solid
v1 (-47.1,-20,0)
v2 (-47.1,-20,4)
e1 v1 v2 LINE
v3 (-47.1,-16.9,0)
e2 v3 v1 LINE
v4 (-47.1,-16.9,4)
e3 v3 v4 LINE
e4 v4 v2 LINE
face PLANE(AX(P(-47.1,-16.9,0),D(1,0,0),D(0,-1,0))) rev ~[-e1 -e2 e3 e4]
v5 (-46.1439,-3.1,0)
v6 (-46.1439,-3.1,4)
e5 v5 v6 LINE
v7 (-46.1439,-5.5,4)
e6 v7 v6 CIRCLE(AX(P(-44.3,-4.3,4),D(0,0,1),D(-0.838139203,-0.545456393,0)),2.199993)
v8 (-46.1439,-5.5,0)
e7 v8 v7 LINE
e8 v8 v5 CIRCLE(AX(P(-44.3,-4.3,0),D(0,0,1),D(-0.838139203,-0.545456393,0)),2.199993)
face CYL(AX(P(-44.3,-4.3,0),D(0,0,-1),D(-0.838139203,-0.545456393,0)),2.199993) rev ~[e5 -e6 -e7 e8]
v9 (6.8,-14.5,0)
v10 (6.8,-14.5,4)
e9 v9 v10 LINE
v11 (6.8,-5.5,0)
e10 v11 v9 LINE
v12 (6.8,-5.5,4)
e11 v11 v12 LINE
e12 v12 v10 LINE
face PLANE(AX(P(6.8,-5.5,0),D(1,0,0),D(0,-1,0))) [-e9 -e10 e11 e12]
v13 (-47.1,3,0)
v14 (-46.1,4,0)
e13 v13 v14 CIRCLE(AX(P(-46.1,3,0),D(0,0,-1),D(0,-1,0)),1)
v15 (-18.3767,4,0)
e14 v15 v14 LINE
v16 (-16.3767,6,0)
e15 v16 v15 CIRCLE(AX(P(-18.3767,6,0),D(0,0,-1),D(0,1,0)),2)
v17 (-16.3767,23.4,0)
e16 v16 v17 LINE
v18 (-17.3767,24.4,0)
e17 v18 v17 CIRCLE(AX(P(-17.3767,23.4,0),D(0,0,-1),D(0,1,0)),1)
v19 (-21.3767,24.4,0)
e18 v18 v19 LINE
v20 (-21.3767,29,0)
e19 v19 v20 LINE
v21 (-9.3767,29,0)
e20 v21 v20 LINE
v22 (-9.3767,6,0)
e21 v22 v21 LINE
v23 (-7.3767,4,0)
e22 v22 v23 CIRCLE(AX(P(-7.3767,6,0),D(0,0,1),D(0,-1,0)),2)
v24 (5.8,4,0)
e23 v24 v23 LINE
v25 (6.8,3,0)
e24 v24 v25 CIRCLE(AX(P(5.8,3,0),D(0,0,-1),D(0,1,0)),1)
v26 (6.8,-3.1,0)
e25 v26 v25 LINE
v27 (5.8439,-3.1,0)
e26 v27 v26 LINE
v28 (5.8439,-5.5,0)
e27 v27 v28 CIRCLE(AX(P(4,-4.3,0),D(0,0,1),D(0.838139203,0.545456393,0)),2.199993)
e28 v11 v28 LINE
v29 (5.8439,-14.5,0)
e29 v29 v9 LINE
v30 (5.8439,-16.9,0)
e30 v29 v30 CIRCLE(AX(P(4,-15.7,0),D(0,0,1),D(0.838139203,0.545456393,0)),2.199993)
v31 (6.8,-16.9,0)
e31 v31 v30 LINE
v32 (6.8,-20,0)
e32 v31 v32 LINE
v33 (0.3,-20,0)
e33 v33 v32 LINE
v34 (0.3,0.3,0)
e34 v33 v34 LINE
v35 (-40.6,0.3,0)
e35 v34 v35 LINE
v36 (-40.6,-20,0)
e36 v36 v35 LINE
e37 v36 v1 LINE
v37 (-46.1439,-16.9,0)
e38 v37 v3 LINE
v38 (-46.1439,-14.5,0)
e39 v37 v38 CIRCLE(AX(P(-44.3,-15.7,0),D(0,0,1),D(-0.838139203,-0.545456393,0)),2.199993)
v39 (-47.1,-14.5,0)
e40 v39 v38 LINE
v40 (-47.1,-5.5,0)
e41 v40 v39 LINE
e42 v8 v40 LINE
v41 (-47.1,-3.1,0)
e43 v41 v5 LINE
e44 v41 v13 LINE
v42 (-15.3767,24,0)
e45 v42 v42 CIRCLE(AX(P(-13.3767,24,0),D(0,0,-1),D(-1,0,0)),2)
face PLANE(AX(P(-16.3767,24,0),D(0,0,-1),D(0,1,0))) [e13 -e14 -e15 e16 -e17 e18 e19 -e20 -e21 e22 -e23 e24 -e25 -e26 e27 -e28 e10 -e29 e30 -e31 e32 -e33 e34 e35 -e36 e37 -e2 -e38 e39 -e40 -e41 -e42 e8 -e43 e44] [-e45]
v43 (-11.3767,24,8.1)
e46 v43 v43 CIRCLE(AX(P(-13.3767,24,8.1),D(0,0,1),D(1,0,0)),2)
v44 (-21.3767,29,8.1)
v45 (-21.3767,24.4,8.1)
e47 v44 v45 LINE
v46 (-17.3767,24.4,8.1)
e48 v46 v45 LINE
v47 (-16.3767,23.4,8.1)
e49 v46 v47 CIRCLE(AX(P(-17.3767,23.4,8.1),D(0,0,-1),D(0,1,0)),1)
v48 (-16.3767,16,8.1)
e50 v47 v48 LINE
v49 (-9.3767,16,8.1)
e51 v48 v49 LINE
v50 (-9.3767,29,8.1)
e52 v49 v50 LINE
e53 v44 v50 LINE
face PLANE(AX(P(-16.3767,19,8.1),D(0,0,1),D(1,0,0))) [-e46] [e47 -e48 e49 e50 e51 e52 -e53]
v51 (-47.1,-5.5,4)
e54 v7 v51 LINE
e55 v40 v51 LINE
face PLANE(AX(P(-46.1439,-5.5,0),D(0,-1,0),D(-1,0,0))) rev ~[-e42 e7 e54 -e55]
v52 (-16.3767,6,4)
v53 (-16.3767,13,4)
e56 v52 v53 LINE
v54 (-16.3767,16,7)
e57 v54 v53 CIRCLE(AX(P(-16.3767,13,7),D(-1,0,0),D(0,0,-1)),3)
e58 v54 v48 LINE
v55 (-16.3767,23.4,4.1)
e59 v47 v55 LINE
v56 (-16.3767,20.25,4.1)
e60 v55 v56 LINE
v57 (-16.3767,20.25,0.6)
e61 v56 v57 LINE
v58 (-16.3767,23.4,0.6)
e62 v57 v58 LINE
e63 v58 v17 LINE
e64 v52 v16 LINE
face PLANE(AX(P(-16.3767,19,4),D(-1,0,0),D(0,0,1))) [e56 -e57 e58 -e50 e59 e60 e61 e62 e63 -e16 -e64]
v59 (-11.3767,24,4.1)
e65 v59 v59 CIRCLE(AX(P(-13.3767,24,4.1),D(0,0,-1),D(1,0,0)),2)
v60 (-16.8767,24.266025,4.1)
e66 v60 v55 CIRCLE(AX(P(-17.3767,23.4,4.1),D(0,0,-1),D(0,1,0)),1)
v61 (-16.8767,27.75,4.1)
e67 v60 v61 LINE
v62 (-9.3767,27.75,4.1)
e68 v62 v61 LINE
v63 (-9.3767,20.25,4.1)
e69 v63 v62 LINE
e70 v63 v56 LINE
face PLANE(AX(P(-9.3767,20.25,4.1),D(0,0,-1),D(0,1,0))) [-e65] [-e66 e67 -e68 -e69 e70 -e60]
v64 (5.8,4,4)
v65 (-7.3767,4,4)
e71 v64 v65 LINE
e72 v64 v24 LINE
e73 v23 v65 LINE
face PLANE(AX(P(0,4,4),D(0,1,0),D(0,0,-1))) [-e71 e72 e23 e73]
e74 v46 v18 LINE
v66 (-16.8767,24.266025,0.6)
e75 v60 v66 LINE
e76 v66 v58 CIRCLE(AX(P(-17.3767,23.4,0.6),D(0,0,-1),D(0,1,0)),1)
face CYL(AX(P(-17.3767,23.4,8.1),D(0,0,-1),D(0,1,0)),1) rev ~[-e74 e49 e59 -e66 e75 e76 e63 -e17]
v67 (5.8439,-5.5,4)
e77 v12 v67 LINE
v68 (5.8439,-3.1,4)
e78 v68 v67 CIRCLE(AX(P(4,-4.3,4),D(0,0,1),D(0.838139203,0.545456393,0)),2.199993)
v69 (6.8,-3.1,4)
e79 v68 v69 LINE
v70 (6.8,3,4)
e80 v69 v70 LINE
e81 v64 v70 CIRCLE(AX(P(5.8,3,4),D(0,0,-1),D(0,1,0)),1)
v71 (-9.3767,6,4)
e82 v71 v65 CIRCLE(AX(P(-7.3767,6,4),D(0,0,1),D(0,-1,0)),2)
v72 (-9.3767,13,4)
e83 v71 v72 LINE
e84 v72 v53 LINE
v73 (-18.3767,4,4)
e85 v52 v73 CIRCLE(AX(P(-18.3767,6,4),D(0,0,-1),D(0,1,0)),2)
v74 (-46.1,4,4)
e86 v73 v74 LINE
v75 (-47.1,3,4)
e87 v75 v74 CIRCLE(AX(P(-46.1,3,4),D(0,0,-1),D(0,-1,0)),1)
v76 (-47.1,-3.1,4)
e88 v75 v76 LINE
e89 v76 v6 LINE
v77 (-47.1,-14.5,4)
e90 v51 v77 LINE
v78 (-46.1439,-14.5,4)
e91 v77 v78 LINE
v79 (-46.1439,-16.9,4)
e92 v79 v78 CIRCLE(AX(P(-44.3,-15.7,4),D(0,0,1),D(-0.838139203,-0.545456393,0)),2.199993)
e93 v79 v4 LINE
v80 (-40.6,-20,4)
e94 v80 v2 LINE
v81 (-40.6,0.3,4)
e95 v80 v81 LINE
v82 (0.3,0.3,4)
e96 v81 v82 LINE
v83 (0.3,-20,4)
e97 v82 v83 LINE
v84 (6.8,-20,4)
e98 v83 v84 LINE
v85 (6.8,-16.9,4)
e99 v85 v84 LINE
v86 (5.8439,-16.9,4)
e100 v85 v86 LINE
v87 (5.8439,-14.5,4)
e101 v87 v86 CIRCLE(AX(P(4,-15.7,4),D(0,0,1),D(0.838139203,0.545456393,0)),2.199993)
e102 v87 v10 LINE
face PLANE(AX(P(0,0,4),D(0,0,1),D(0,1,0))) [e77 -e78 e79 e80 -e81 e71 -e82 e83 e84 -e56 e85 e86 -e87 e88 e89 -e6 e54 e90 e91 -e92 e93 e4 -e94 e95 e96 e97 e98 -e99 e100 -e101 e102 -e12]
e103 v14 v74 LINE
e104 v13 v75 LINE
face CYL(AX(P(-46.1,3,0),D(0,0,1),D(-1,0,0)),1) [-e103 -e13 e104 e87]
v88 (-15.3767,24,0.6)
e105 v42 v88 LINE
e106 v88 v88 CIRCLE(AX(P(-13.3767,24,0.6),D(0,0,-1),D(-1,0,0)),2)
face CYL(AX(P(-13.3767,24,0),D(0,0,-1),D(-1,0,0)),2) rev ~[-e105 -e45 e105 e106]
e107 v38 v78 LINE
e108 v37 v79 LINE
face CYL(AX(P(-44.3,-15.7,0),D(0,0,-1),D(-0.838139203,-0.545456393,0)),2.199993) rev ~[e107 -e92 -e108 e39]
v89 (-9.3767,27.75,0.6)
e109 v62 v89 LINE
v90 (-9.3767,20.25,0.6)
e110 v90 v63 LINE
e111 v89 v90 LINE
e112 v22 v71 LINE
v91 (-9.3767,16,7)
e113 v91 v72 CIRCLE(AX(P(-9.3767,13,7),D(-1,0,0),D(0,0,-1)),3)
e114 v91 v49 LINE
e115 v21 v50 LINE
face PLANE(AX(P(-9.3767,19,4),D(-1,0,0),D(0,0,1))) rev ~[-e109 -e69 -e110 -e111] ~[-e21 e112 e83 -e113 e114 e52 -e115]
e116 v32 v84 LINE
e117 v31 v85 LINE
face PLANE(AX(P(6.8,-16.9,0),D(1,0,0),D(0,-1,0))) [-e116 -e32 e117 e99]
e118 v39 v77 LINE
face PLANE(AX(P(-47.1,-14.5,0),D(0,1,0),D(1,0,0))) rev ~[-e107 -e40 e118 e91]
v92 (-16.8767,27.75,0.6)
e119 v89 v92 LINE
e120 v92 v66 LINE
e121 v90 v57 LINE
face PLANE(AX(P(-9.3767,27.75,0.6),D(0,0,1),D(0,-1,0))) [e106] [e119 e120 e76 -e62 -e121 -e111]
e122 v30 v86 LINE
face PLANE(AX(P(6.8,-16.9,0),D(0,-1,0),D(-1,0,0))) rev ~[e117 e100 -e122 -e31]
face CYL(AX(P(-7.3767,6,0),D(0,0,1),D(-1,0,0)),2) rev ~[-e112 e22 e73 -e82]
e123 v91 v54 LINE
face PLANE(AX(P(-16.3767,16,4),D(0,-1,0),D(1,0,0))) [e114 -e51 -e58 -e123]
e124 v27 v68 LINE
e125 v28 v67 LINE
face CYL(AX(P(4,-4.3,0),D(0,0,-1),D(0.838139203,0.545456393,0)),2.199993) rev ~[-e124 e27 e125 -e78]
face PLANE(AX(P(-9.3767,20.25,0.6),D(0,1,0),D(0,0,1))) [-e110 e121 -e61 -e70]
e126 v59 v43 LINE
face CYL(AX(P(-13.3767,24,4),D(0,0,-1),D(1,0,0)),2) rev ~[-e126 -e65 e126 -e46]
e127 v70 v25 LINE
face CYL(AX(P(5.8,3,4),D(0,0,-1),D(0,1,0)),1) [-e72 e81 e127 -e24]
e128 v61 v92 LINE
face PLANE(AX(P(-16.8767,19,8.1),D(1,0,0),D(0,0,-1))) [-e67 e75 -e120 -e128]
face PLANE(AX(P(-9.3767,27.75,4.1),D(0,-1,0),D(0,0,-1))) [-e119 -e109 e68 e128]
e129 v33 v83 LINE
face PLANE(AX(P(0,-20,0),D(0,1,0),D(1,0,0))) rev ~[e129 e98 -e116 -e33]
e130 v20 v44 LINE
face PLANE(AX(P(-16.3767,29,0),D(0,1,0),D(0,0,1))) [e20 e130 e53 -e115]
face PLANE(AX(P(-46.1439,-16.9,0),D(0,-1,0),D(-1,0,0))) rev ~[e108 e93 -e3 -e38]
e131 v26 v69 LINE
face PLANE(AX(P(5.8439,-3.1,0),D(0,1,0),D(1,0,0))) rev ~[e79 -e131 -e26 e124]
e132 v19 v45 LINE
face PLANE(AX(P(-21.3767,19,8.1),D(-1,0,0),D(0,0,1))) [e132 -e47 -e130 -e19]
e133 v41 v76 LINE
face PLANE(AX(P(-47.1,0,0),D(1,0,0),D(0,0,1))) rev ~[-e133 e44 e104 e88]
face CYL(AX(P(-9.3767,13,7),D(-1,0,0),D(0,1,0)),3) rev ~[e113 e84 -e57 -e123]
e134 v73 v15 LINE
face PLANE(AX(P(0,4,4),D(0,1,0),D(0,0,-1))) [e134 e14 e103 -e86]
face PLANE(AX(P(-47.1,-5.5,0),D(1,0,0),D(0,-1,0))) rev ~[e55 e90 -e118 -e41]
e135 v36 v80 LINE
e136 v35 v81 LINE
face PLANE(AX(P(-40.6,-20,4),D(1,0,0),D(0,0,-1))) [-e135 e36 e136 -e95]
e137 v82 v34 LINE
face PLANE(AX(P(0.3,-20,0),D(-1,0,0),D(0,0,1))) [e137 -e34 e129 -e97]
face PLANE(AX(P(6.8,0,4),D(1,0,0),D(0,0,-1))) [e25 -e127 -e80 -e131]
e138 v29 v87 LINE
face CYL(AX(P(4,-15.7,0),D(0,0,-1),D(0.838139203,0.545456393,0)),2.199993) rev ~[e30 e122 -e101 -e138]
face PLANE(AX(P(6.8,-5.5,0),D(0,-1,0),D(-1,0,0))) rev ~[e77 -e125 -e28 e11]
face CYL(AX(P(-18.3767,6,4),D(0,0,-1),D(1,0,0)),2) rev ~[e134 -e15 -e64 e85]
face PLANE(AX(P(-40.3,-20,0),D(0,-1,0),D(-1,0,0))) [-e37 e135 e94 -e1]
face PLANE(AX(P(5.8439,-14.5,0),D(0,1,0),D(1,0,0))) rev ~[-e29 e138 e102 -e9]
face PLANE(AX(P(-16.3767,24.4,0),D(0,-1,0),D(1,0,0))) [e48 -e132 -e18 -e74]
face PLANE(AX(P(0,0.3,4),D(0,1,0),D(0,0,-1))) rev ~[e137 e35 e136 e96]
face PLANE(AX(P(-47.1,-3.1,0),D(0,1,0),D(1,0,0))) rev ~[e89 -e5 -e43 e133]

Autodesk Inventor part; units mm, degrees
ref_plane "YZ Plane" through (0, 0, 0) normal (1, 0, 0) x (0, 1, 0)
sketch "Sketch1" plane through (0, 0, 0) normal (0, 0, 1) x (1, 0, 0)
  line L0 (5.8439, -14.5) -> (6.8, -14.5) projected
  line L1 (6.8, -5.5) -> (6.8, -14.5) projected
  line L2 (6.8, -5.5) -> (5.8439, -5.5) projected
  arc A0 (5.8439, -3.1) -> (5.8439, -5.5) centre (4, -4.3) ccw projected
  line L3 (5.8439, -3.1) -> (6.8, -3.1) projected
  line L4 (6.8, 0) -> (6.8, -3.1) projected
  line L5 (0, 0) -> (6.8, 0) projected
  line L6 (0, -20) -> (0, 0) projected
  line L7 (0, -20) -> (6.8, -20) projected
  line L8 (6.8, -16.9) -> (6.8, -20) projected
  line L9 (6.8, -16.9) -> (5.8439, -16.9) projected
  arc A1 (5.8439, -14.5) -> (5.8439, -16.9) centre (4, -15.7) ccw projected
  line L10 (-47.1, -14.5) -> (-46.1439, -14.5) projected
  arc A2 (-46.1439, -16.9) -> (-46.1439, -14.5) centre (-44.3, -15.7) ccw projected
  line L11 (-46.1439, -16.9) -> (-47.1, -16.9) projected
  line L12 (-47.1, -16.9) -> (-47.1, -20) projected
  line L13 (-40.3, -20) -> (-47.1, -20) projected
  line L14 (-40.3, 0) -> (-40.3, -20) projected
  line L15 (-40.3, 0) -> (-47.1, 0) projected
  line L16 (-47.1, 0) -> (-47.1, -3.1) projected
  line L17 (-47.1, -3.1) -> (-46.1439, -3.1) projected
  arc A3 (-46.1439, -5.5) -> (-46.1439, -3.1) centre (-44.3, -4.3) ccw projected
  line L18 (-46.1439, -5.5) -> (-47.1, -5.5) projected
  line L19 (-47.1, -5.5) -> (-47.1, -14.5) projected
extrude "Extrusion1" add sketch "Sketch1" along normal blind 4
sketch "Sketch2" plane through (0, 0, 0) normal (0, 1, 0) x (1, 0, 0)
  line L0 (0, 0) -> (6.8, 0) projected
  line L1 (0, 0) -> (0, -4) projected
  line L2 (6.8, -4) -> (0, -4) projected
  line L3 (6.8, 0) -> (6.8, -4) projected
  line L4 (-47.1, 0) -> (-47.1, -4) projected
  line L5 (-40.3, -4) -> (-47.1, -4) projected
  line L6 (6.8, 0) -> (-47.1, 0)
  line L7 (-47.1, 0) -> (-47.1, -4)
  line L8 (-47.1, -4) -> (6.8, -4)
  line L9 (6.8, -4) -> (6.8, 0)
extrude "Extrusion2" add sketch "Sketch2" along normal blind 4 contours L1 L8 L5 L4 L6
sketch "Sketch3" plane through (0, 0, 4) normal (1, 0, 0) x (0, 0, -1)
  line L0 (4, 0) -> (0, 0) projected
  line L1 (4, 4) -> (4, 0) projected
  line L2 (0, 4) -> (4, 4) projected
  line L3 (0, 0) -> (0, 4) projected
extrude "Extrusion3" add sketch "Sketch3" along normal up to surface (6.8 mm away)
sketch "Sketch4" plane through (0, 4, 0) normal (0, 1, 0) x (1, 0, 0)
  line L0 (6.8, 0) -> (-47.1, 0) projected
  line L1 (-47.1, -4) -> (6.8, -4) projected
  line L2 (-9.3767, -8.1) -> (-9.3767, -13.1) construction
  line L3 (-21.8189, -8.1) -> (-9.3767, -8.1) construction
  arc A0 (-17.3767, -8.1) -> (-40.8, 16.4941) centre (-48.3, -14.1) ccw construction
  line L4 (-9.3767, -4) -> (-16.3767, -4) construction
  line L5 (-16.3767, -4) -> (-16.3767, -8.1) construction
  line L6 (-16.3767, -8.1) -> (-9.3767, -8.1) construction
  line L7 (-9.3767, -8.1) -> (-9.3767, -4) construction
  line L8 (-9.3767, -4) -> (-16.3767, -4)
  line L9 (-16.3767, -4) -> (-16.3767, 0)
  line L10 (-16.3767, 0) -> (-9.3767, 0)
  line L11 (-9.3767, 0) -> (-9.3767, -4)
  point P0 (0, 0)
  dimension "d6" = 7
ref_plane "Work Plane1" through (-21.8189, 29, 8.1) normal (0, 1, 0) x (0, 0, 1)
extrude "Extrusion4" add sketch "Sketch4" along normal up to surface (25 mm away)
sketch "Sketch5" plane through (0, 0, 4) normal (0, 0, 1) x (1, 0, 0)
  circle A0 centre (-13.3767, 24) radius 2 construction
  line L0 (-21.8189, 24) -> (-17.3767, 24) construction
  line L1 (-21.8189, 24) -> (-21.8189, 29) construction
  line L2 (-21.8189, 29) -> (-9.3767, 29) construction
  line L3 (-9.3767, 19) -> (-9.3767, 29) construction
  line L4 (-17.3767, 19) -> (-9.3767, 19) construction
  line L5 (-17.3767, 24) -> (-17.3767, 19) construction
  line L6 (-9.3767, 19) -> (-16.3767, 19) construction
  line L7 (-16.3767, 19) -> (-16.3767, 29) construction
  line L8 (-16.3767, 29) -> (-9.3767, 29) construction
  line L9 (-9.3767, 29) -> (-9.3767, 19) construction
  line L10 (-9.3767, 19) -> (-16.3767, 19)
  line L11 (-16.3767, 19) -> (-16.3767, 29)
  line L12 (-16.3767, 29) -> (-9.3767, 29)
  line L13 (-9.3767, 29) -> (-9.3767, 19)
  circle A1 centre (-13.3767, 24) radius 2
ref_plane "Work Plane2" through (-21.8189, 19, 8.1) normal (0, 0, -1) x (0, 1, 0)
extrude "Extrusion5" add sketch "Sketch5" along normal up to surface (4.1 mm away)
fillet "Fillet2" radius 2 2 edges at (-9.3767, 4, 2) (-16.3767, 4, 2)
sketch "Sketch6" plane through (-16.3767, 19, 8.1) normal (-1, 0, 0) x (0, 0, 1)
  line L0 (0, 5) -> (-24.5941, 5) construction
  line L1 (0, 0) -> (-24.5941, 0) construction
  line L2 (-8.1, 10) -> (0.5132, 10) construction
  line L3 (0.5132, 10) -> (0.5132, 5) construction
  line L4 (0.5132, 5) -> (-8.1, 5) construction
  line L5 (-8.1, 5) -> (-8.1, 10) construction
  line L6 (-8.1, 10) -> (0, 10)
  line L7 (0, 10) -> (0, 5)
  line L8 (0, 5) -> (-8.1, 5)
  line L9 (-8.1, 5) -> (-8.1, 10)
  point P0 (-8.1, -19)
extrude "Extrusion6" add sketch "Sketch6" along normal blind 5
sketch "Sketch7" plane through (-16.3767, 24, 0) normal (0, -1, 0) x (1, 0, 0)
  line L0 (0, 8.1) -> (0, 0) projected
  line L1 (0, 8.1) -> (-5, 8.1) projected
  line L2 (-5, 0) -> (-5, 8.1) projected
  line L3 (0, 0) -> (-5, 0) projected
  point P0 (16.3767, 0)
extrude "Extrusion7" cut sketch "Sketch7" against normal blind 0.4
sketch "Sketch8" plane through (0, 0, 0) normal (0, 0, -1) x (-1, 0, 0)
  circle A0 centre (13.3767, 24) radius 2 construction
  circle A1 centre (13.3767, 24) radius 2 projected
extrude "Extrusion8" cut sketch "Sketch8" against normal blind 4
fillet "Fillet3" radius 1 1 edges at (-16.3767, 24.4, 4.05)
sketch "Sketch9" plane through (-9.3767, 19, 8.1) normal (1, 0, 0) x (0, 0, -1)
  line L0 (0, 0) -> (0, 10) projected
  line L1 (8.1, 7) -> (0, 7) construction
  line L2 (8.1, 3) -> (0, 3) construction
  line L3 (24.5941, 5) -> (0, 5) construction
  line L4 (-5, 5) -> (0, 5) construction
  line L5 (4, 8.75) -> (7.5, 8.75)
  line L6 (7.5, 8.75) -> (7.5, 1.25)
  line L7 (7.5, 1.25) -> (4, 1.25)
  line L8 (4, 1.25) -> (4, 8.75)
  point P0 (8.1, -19)
  point P1 (4, 5)
  dimension "d20" = 3.5
  dimension "d21" = 7.5
  dimension "d22" = 4
extrude "Extrusion9" cut sketch "Sketch9" against normal blind 7.5
sketch "Sketch10" plane through (-16.3767, 19, 4) normal (0, -1, 0) x (1, 0, 0)
  line L0 (0, 4.1) -> (7, 4.1) projected
  line L1 (0, 0) -> (0, 4.1) projected
  line L2 (7, 0) -> (0, 0) projected
  line L3 (7, 0) -> (7, 4.1) projected
  point P0 (16.3767, -4)
extrude "Extrusion10" add sketch "Sketch10" along normal blind 3
fillet "Fillet4" radius 3 1 edges at (-12.8767, 16, 4)
sketch "Sketch11" plane through (0, 0, 0) normal (0, -1, 0) x (1, 0, 0)
  line L0 (-40.3, 0) -> (-40.3, 4) projected
  line L1 (0, 0) -> (-40.3, 0) projected
  line L2 (0, 0) -> (0, 4) projected
  line L3 (-40.3, 4) -> (0, 4) projected
extrude "Extrusion11" cut sketch "Sketch11" against normal blind 0.3
sketch "Sketch12" plane through (0, -20, 0) normal (-1, 0, 0) x (0, 0, 1)
  line L0 (0, 0) -> (0, 20.3) projected
  line L1 (0, 0) -> (4, 0) projected
  line L2 (4, 20.3) -> (4, 0) projected
  line L3 (4, 20.3) -> (0, 20.3) projected
  point P0 (0, 20)
extrude "Extrusion12" cut sketch "Sketch12" against normal blind 0.3
sketch "Sketch13" plane through (-40.3, -20, 4) normal (1, 0, 0) x (0, 0, -1)
  line L0 (4, 0) -> (4, 20.3) projected
  line L1 (4, 20.3) -> (0, 20.3) projected
  line L2 (0, 0) -> (0, 20.3) projected
  line L3 (4, 0) -> (0, 0) projected
  point P0 (4, 20)
extrude "Extrusion13" cut sketch "Sketch13" against normal blind 0.3
fillet "Fillet5" radius 1 2 edges at (6.8, 4, 2) (-47.1, 4, 2)
properties part number "MG996RBracket"
